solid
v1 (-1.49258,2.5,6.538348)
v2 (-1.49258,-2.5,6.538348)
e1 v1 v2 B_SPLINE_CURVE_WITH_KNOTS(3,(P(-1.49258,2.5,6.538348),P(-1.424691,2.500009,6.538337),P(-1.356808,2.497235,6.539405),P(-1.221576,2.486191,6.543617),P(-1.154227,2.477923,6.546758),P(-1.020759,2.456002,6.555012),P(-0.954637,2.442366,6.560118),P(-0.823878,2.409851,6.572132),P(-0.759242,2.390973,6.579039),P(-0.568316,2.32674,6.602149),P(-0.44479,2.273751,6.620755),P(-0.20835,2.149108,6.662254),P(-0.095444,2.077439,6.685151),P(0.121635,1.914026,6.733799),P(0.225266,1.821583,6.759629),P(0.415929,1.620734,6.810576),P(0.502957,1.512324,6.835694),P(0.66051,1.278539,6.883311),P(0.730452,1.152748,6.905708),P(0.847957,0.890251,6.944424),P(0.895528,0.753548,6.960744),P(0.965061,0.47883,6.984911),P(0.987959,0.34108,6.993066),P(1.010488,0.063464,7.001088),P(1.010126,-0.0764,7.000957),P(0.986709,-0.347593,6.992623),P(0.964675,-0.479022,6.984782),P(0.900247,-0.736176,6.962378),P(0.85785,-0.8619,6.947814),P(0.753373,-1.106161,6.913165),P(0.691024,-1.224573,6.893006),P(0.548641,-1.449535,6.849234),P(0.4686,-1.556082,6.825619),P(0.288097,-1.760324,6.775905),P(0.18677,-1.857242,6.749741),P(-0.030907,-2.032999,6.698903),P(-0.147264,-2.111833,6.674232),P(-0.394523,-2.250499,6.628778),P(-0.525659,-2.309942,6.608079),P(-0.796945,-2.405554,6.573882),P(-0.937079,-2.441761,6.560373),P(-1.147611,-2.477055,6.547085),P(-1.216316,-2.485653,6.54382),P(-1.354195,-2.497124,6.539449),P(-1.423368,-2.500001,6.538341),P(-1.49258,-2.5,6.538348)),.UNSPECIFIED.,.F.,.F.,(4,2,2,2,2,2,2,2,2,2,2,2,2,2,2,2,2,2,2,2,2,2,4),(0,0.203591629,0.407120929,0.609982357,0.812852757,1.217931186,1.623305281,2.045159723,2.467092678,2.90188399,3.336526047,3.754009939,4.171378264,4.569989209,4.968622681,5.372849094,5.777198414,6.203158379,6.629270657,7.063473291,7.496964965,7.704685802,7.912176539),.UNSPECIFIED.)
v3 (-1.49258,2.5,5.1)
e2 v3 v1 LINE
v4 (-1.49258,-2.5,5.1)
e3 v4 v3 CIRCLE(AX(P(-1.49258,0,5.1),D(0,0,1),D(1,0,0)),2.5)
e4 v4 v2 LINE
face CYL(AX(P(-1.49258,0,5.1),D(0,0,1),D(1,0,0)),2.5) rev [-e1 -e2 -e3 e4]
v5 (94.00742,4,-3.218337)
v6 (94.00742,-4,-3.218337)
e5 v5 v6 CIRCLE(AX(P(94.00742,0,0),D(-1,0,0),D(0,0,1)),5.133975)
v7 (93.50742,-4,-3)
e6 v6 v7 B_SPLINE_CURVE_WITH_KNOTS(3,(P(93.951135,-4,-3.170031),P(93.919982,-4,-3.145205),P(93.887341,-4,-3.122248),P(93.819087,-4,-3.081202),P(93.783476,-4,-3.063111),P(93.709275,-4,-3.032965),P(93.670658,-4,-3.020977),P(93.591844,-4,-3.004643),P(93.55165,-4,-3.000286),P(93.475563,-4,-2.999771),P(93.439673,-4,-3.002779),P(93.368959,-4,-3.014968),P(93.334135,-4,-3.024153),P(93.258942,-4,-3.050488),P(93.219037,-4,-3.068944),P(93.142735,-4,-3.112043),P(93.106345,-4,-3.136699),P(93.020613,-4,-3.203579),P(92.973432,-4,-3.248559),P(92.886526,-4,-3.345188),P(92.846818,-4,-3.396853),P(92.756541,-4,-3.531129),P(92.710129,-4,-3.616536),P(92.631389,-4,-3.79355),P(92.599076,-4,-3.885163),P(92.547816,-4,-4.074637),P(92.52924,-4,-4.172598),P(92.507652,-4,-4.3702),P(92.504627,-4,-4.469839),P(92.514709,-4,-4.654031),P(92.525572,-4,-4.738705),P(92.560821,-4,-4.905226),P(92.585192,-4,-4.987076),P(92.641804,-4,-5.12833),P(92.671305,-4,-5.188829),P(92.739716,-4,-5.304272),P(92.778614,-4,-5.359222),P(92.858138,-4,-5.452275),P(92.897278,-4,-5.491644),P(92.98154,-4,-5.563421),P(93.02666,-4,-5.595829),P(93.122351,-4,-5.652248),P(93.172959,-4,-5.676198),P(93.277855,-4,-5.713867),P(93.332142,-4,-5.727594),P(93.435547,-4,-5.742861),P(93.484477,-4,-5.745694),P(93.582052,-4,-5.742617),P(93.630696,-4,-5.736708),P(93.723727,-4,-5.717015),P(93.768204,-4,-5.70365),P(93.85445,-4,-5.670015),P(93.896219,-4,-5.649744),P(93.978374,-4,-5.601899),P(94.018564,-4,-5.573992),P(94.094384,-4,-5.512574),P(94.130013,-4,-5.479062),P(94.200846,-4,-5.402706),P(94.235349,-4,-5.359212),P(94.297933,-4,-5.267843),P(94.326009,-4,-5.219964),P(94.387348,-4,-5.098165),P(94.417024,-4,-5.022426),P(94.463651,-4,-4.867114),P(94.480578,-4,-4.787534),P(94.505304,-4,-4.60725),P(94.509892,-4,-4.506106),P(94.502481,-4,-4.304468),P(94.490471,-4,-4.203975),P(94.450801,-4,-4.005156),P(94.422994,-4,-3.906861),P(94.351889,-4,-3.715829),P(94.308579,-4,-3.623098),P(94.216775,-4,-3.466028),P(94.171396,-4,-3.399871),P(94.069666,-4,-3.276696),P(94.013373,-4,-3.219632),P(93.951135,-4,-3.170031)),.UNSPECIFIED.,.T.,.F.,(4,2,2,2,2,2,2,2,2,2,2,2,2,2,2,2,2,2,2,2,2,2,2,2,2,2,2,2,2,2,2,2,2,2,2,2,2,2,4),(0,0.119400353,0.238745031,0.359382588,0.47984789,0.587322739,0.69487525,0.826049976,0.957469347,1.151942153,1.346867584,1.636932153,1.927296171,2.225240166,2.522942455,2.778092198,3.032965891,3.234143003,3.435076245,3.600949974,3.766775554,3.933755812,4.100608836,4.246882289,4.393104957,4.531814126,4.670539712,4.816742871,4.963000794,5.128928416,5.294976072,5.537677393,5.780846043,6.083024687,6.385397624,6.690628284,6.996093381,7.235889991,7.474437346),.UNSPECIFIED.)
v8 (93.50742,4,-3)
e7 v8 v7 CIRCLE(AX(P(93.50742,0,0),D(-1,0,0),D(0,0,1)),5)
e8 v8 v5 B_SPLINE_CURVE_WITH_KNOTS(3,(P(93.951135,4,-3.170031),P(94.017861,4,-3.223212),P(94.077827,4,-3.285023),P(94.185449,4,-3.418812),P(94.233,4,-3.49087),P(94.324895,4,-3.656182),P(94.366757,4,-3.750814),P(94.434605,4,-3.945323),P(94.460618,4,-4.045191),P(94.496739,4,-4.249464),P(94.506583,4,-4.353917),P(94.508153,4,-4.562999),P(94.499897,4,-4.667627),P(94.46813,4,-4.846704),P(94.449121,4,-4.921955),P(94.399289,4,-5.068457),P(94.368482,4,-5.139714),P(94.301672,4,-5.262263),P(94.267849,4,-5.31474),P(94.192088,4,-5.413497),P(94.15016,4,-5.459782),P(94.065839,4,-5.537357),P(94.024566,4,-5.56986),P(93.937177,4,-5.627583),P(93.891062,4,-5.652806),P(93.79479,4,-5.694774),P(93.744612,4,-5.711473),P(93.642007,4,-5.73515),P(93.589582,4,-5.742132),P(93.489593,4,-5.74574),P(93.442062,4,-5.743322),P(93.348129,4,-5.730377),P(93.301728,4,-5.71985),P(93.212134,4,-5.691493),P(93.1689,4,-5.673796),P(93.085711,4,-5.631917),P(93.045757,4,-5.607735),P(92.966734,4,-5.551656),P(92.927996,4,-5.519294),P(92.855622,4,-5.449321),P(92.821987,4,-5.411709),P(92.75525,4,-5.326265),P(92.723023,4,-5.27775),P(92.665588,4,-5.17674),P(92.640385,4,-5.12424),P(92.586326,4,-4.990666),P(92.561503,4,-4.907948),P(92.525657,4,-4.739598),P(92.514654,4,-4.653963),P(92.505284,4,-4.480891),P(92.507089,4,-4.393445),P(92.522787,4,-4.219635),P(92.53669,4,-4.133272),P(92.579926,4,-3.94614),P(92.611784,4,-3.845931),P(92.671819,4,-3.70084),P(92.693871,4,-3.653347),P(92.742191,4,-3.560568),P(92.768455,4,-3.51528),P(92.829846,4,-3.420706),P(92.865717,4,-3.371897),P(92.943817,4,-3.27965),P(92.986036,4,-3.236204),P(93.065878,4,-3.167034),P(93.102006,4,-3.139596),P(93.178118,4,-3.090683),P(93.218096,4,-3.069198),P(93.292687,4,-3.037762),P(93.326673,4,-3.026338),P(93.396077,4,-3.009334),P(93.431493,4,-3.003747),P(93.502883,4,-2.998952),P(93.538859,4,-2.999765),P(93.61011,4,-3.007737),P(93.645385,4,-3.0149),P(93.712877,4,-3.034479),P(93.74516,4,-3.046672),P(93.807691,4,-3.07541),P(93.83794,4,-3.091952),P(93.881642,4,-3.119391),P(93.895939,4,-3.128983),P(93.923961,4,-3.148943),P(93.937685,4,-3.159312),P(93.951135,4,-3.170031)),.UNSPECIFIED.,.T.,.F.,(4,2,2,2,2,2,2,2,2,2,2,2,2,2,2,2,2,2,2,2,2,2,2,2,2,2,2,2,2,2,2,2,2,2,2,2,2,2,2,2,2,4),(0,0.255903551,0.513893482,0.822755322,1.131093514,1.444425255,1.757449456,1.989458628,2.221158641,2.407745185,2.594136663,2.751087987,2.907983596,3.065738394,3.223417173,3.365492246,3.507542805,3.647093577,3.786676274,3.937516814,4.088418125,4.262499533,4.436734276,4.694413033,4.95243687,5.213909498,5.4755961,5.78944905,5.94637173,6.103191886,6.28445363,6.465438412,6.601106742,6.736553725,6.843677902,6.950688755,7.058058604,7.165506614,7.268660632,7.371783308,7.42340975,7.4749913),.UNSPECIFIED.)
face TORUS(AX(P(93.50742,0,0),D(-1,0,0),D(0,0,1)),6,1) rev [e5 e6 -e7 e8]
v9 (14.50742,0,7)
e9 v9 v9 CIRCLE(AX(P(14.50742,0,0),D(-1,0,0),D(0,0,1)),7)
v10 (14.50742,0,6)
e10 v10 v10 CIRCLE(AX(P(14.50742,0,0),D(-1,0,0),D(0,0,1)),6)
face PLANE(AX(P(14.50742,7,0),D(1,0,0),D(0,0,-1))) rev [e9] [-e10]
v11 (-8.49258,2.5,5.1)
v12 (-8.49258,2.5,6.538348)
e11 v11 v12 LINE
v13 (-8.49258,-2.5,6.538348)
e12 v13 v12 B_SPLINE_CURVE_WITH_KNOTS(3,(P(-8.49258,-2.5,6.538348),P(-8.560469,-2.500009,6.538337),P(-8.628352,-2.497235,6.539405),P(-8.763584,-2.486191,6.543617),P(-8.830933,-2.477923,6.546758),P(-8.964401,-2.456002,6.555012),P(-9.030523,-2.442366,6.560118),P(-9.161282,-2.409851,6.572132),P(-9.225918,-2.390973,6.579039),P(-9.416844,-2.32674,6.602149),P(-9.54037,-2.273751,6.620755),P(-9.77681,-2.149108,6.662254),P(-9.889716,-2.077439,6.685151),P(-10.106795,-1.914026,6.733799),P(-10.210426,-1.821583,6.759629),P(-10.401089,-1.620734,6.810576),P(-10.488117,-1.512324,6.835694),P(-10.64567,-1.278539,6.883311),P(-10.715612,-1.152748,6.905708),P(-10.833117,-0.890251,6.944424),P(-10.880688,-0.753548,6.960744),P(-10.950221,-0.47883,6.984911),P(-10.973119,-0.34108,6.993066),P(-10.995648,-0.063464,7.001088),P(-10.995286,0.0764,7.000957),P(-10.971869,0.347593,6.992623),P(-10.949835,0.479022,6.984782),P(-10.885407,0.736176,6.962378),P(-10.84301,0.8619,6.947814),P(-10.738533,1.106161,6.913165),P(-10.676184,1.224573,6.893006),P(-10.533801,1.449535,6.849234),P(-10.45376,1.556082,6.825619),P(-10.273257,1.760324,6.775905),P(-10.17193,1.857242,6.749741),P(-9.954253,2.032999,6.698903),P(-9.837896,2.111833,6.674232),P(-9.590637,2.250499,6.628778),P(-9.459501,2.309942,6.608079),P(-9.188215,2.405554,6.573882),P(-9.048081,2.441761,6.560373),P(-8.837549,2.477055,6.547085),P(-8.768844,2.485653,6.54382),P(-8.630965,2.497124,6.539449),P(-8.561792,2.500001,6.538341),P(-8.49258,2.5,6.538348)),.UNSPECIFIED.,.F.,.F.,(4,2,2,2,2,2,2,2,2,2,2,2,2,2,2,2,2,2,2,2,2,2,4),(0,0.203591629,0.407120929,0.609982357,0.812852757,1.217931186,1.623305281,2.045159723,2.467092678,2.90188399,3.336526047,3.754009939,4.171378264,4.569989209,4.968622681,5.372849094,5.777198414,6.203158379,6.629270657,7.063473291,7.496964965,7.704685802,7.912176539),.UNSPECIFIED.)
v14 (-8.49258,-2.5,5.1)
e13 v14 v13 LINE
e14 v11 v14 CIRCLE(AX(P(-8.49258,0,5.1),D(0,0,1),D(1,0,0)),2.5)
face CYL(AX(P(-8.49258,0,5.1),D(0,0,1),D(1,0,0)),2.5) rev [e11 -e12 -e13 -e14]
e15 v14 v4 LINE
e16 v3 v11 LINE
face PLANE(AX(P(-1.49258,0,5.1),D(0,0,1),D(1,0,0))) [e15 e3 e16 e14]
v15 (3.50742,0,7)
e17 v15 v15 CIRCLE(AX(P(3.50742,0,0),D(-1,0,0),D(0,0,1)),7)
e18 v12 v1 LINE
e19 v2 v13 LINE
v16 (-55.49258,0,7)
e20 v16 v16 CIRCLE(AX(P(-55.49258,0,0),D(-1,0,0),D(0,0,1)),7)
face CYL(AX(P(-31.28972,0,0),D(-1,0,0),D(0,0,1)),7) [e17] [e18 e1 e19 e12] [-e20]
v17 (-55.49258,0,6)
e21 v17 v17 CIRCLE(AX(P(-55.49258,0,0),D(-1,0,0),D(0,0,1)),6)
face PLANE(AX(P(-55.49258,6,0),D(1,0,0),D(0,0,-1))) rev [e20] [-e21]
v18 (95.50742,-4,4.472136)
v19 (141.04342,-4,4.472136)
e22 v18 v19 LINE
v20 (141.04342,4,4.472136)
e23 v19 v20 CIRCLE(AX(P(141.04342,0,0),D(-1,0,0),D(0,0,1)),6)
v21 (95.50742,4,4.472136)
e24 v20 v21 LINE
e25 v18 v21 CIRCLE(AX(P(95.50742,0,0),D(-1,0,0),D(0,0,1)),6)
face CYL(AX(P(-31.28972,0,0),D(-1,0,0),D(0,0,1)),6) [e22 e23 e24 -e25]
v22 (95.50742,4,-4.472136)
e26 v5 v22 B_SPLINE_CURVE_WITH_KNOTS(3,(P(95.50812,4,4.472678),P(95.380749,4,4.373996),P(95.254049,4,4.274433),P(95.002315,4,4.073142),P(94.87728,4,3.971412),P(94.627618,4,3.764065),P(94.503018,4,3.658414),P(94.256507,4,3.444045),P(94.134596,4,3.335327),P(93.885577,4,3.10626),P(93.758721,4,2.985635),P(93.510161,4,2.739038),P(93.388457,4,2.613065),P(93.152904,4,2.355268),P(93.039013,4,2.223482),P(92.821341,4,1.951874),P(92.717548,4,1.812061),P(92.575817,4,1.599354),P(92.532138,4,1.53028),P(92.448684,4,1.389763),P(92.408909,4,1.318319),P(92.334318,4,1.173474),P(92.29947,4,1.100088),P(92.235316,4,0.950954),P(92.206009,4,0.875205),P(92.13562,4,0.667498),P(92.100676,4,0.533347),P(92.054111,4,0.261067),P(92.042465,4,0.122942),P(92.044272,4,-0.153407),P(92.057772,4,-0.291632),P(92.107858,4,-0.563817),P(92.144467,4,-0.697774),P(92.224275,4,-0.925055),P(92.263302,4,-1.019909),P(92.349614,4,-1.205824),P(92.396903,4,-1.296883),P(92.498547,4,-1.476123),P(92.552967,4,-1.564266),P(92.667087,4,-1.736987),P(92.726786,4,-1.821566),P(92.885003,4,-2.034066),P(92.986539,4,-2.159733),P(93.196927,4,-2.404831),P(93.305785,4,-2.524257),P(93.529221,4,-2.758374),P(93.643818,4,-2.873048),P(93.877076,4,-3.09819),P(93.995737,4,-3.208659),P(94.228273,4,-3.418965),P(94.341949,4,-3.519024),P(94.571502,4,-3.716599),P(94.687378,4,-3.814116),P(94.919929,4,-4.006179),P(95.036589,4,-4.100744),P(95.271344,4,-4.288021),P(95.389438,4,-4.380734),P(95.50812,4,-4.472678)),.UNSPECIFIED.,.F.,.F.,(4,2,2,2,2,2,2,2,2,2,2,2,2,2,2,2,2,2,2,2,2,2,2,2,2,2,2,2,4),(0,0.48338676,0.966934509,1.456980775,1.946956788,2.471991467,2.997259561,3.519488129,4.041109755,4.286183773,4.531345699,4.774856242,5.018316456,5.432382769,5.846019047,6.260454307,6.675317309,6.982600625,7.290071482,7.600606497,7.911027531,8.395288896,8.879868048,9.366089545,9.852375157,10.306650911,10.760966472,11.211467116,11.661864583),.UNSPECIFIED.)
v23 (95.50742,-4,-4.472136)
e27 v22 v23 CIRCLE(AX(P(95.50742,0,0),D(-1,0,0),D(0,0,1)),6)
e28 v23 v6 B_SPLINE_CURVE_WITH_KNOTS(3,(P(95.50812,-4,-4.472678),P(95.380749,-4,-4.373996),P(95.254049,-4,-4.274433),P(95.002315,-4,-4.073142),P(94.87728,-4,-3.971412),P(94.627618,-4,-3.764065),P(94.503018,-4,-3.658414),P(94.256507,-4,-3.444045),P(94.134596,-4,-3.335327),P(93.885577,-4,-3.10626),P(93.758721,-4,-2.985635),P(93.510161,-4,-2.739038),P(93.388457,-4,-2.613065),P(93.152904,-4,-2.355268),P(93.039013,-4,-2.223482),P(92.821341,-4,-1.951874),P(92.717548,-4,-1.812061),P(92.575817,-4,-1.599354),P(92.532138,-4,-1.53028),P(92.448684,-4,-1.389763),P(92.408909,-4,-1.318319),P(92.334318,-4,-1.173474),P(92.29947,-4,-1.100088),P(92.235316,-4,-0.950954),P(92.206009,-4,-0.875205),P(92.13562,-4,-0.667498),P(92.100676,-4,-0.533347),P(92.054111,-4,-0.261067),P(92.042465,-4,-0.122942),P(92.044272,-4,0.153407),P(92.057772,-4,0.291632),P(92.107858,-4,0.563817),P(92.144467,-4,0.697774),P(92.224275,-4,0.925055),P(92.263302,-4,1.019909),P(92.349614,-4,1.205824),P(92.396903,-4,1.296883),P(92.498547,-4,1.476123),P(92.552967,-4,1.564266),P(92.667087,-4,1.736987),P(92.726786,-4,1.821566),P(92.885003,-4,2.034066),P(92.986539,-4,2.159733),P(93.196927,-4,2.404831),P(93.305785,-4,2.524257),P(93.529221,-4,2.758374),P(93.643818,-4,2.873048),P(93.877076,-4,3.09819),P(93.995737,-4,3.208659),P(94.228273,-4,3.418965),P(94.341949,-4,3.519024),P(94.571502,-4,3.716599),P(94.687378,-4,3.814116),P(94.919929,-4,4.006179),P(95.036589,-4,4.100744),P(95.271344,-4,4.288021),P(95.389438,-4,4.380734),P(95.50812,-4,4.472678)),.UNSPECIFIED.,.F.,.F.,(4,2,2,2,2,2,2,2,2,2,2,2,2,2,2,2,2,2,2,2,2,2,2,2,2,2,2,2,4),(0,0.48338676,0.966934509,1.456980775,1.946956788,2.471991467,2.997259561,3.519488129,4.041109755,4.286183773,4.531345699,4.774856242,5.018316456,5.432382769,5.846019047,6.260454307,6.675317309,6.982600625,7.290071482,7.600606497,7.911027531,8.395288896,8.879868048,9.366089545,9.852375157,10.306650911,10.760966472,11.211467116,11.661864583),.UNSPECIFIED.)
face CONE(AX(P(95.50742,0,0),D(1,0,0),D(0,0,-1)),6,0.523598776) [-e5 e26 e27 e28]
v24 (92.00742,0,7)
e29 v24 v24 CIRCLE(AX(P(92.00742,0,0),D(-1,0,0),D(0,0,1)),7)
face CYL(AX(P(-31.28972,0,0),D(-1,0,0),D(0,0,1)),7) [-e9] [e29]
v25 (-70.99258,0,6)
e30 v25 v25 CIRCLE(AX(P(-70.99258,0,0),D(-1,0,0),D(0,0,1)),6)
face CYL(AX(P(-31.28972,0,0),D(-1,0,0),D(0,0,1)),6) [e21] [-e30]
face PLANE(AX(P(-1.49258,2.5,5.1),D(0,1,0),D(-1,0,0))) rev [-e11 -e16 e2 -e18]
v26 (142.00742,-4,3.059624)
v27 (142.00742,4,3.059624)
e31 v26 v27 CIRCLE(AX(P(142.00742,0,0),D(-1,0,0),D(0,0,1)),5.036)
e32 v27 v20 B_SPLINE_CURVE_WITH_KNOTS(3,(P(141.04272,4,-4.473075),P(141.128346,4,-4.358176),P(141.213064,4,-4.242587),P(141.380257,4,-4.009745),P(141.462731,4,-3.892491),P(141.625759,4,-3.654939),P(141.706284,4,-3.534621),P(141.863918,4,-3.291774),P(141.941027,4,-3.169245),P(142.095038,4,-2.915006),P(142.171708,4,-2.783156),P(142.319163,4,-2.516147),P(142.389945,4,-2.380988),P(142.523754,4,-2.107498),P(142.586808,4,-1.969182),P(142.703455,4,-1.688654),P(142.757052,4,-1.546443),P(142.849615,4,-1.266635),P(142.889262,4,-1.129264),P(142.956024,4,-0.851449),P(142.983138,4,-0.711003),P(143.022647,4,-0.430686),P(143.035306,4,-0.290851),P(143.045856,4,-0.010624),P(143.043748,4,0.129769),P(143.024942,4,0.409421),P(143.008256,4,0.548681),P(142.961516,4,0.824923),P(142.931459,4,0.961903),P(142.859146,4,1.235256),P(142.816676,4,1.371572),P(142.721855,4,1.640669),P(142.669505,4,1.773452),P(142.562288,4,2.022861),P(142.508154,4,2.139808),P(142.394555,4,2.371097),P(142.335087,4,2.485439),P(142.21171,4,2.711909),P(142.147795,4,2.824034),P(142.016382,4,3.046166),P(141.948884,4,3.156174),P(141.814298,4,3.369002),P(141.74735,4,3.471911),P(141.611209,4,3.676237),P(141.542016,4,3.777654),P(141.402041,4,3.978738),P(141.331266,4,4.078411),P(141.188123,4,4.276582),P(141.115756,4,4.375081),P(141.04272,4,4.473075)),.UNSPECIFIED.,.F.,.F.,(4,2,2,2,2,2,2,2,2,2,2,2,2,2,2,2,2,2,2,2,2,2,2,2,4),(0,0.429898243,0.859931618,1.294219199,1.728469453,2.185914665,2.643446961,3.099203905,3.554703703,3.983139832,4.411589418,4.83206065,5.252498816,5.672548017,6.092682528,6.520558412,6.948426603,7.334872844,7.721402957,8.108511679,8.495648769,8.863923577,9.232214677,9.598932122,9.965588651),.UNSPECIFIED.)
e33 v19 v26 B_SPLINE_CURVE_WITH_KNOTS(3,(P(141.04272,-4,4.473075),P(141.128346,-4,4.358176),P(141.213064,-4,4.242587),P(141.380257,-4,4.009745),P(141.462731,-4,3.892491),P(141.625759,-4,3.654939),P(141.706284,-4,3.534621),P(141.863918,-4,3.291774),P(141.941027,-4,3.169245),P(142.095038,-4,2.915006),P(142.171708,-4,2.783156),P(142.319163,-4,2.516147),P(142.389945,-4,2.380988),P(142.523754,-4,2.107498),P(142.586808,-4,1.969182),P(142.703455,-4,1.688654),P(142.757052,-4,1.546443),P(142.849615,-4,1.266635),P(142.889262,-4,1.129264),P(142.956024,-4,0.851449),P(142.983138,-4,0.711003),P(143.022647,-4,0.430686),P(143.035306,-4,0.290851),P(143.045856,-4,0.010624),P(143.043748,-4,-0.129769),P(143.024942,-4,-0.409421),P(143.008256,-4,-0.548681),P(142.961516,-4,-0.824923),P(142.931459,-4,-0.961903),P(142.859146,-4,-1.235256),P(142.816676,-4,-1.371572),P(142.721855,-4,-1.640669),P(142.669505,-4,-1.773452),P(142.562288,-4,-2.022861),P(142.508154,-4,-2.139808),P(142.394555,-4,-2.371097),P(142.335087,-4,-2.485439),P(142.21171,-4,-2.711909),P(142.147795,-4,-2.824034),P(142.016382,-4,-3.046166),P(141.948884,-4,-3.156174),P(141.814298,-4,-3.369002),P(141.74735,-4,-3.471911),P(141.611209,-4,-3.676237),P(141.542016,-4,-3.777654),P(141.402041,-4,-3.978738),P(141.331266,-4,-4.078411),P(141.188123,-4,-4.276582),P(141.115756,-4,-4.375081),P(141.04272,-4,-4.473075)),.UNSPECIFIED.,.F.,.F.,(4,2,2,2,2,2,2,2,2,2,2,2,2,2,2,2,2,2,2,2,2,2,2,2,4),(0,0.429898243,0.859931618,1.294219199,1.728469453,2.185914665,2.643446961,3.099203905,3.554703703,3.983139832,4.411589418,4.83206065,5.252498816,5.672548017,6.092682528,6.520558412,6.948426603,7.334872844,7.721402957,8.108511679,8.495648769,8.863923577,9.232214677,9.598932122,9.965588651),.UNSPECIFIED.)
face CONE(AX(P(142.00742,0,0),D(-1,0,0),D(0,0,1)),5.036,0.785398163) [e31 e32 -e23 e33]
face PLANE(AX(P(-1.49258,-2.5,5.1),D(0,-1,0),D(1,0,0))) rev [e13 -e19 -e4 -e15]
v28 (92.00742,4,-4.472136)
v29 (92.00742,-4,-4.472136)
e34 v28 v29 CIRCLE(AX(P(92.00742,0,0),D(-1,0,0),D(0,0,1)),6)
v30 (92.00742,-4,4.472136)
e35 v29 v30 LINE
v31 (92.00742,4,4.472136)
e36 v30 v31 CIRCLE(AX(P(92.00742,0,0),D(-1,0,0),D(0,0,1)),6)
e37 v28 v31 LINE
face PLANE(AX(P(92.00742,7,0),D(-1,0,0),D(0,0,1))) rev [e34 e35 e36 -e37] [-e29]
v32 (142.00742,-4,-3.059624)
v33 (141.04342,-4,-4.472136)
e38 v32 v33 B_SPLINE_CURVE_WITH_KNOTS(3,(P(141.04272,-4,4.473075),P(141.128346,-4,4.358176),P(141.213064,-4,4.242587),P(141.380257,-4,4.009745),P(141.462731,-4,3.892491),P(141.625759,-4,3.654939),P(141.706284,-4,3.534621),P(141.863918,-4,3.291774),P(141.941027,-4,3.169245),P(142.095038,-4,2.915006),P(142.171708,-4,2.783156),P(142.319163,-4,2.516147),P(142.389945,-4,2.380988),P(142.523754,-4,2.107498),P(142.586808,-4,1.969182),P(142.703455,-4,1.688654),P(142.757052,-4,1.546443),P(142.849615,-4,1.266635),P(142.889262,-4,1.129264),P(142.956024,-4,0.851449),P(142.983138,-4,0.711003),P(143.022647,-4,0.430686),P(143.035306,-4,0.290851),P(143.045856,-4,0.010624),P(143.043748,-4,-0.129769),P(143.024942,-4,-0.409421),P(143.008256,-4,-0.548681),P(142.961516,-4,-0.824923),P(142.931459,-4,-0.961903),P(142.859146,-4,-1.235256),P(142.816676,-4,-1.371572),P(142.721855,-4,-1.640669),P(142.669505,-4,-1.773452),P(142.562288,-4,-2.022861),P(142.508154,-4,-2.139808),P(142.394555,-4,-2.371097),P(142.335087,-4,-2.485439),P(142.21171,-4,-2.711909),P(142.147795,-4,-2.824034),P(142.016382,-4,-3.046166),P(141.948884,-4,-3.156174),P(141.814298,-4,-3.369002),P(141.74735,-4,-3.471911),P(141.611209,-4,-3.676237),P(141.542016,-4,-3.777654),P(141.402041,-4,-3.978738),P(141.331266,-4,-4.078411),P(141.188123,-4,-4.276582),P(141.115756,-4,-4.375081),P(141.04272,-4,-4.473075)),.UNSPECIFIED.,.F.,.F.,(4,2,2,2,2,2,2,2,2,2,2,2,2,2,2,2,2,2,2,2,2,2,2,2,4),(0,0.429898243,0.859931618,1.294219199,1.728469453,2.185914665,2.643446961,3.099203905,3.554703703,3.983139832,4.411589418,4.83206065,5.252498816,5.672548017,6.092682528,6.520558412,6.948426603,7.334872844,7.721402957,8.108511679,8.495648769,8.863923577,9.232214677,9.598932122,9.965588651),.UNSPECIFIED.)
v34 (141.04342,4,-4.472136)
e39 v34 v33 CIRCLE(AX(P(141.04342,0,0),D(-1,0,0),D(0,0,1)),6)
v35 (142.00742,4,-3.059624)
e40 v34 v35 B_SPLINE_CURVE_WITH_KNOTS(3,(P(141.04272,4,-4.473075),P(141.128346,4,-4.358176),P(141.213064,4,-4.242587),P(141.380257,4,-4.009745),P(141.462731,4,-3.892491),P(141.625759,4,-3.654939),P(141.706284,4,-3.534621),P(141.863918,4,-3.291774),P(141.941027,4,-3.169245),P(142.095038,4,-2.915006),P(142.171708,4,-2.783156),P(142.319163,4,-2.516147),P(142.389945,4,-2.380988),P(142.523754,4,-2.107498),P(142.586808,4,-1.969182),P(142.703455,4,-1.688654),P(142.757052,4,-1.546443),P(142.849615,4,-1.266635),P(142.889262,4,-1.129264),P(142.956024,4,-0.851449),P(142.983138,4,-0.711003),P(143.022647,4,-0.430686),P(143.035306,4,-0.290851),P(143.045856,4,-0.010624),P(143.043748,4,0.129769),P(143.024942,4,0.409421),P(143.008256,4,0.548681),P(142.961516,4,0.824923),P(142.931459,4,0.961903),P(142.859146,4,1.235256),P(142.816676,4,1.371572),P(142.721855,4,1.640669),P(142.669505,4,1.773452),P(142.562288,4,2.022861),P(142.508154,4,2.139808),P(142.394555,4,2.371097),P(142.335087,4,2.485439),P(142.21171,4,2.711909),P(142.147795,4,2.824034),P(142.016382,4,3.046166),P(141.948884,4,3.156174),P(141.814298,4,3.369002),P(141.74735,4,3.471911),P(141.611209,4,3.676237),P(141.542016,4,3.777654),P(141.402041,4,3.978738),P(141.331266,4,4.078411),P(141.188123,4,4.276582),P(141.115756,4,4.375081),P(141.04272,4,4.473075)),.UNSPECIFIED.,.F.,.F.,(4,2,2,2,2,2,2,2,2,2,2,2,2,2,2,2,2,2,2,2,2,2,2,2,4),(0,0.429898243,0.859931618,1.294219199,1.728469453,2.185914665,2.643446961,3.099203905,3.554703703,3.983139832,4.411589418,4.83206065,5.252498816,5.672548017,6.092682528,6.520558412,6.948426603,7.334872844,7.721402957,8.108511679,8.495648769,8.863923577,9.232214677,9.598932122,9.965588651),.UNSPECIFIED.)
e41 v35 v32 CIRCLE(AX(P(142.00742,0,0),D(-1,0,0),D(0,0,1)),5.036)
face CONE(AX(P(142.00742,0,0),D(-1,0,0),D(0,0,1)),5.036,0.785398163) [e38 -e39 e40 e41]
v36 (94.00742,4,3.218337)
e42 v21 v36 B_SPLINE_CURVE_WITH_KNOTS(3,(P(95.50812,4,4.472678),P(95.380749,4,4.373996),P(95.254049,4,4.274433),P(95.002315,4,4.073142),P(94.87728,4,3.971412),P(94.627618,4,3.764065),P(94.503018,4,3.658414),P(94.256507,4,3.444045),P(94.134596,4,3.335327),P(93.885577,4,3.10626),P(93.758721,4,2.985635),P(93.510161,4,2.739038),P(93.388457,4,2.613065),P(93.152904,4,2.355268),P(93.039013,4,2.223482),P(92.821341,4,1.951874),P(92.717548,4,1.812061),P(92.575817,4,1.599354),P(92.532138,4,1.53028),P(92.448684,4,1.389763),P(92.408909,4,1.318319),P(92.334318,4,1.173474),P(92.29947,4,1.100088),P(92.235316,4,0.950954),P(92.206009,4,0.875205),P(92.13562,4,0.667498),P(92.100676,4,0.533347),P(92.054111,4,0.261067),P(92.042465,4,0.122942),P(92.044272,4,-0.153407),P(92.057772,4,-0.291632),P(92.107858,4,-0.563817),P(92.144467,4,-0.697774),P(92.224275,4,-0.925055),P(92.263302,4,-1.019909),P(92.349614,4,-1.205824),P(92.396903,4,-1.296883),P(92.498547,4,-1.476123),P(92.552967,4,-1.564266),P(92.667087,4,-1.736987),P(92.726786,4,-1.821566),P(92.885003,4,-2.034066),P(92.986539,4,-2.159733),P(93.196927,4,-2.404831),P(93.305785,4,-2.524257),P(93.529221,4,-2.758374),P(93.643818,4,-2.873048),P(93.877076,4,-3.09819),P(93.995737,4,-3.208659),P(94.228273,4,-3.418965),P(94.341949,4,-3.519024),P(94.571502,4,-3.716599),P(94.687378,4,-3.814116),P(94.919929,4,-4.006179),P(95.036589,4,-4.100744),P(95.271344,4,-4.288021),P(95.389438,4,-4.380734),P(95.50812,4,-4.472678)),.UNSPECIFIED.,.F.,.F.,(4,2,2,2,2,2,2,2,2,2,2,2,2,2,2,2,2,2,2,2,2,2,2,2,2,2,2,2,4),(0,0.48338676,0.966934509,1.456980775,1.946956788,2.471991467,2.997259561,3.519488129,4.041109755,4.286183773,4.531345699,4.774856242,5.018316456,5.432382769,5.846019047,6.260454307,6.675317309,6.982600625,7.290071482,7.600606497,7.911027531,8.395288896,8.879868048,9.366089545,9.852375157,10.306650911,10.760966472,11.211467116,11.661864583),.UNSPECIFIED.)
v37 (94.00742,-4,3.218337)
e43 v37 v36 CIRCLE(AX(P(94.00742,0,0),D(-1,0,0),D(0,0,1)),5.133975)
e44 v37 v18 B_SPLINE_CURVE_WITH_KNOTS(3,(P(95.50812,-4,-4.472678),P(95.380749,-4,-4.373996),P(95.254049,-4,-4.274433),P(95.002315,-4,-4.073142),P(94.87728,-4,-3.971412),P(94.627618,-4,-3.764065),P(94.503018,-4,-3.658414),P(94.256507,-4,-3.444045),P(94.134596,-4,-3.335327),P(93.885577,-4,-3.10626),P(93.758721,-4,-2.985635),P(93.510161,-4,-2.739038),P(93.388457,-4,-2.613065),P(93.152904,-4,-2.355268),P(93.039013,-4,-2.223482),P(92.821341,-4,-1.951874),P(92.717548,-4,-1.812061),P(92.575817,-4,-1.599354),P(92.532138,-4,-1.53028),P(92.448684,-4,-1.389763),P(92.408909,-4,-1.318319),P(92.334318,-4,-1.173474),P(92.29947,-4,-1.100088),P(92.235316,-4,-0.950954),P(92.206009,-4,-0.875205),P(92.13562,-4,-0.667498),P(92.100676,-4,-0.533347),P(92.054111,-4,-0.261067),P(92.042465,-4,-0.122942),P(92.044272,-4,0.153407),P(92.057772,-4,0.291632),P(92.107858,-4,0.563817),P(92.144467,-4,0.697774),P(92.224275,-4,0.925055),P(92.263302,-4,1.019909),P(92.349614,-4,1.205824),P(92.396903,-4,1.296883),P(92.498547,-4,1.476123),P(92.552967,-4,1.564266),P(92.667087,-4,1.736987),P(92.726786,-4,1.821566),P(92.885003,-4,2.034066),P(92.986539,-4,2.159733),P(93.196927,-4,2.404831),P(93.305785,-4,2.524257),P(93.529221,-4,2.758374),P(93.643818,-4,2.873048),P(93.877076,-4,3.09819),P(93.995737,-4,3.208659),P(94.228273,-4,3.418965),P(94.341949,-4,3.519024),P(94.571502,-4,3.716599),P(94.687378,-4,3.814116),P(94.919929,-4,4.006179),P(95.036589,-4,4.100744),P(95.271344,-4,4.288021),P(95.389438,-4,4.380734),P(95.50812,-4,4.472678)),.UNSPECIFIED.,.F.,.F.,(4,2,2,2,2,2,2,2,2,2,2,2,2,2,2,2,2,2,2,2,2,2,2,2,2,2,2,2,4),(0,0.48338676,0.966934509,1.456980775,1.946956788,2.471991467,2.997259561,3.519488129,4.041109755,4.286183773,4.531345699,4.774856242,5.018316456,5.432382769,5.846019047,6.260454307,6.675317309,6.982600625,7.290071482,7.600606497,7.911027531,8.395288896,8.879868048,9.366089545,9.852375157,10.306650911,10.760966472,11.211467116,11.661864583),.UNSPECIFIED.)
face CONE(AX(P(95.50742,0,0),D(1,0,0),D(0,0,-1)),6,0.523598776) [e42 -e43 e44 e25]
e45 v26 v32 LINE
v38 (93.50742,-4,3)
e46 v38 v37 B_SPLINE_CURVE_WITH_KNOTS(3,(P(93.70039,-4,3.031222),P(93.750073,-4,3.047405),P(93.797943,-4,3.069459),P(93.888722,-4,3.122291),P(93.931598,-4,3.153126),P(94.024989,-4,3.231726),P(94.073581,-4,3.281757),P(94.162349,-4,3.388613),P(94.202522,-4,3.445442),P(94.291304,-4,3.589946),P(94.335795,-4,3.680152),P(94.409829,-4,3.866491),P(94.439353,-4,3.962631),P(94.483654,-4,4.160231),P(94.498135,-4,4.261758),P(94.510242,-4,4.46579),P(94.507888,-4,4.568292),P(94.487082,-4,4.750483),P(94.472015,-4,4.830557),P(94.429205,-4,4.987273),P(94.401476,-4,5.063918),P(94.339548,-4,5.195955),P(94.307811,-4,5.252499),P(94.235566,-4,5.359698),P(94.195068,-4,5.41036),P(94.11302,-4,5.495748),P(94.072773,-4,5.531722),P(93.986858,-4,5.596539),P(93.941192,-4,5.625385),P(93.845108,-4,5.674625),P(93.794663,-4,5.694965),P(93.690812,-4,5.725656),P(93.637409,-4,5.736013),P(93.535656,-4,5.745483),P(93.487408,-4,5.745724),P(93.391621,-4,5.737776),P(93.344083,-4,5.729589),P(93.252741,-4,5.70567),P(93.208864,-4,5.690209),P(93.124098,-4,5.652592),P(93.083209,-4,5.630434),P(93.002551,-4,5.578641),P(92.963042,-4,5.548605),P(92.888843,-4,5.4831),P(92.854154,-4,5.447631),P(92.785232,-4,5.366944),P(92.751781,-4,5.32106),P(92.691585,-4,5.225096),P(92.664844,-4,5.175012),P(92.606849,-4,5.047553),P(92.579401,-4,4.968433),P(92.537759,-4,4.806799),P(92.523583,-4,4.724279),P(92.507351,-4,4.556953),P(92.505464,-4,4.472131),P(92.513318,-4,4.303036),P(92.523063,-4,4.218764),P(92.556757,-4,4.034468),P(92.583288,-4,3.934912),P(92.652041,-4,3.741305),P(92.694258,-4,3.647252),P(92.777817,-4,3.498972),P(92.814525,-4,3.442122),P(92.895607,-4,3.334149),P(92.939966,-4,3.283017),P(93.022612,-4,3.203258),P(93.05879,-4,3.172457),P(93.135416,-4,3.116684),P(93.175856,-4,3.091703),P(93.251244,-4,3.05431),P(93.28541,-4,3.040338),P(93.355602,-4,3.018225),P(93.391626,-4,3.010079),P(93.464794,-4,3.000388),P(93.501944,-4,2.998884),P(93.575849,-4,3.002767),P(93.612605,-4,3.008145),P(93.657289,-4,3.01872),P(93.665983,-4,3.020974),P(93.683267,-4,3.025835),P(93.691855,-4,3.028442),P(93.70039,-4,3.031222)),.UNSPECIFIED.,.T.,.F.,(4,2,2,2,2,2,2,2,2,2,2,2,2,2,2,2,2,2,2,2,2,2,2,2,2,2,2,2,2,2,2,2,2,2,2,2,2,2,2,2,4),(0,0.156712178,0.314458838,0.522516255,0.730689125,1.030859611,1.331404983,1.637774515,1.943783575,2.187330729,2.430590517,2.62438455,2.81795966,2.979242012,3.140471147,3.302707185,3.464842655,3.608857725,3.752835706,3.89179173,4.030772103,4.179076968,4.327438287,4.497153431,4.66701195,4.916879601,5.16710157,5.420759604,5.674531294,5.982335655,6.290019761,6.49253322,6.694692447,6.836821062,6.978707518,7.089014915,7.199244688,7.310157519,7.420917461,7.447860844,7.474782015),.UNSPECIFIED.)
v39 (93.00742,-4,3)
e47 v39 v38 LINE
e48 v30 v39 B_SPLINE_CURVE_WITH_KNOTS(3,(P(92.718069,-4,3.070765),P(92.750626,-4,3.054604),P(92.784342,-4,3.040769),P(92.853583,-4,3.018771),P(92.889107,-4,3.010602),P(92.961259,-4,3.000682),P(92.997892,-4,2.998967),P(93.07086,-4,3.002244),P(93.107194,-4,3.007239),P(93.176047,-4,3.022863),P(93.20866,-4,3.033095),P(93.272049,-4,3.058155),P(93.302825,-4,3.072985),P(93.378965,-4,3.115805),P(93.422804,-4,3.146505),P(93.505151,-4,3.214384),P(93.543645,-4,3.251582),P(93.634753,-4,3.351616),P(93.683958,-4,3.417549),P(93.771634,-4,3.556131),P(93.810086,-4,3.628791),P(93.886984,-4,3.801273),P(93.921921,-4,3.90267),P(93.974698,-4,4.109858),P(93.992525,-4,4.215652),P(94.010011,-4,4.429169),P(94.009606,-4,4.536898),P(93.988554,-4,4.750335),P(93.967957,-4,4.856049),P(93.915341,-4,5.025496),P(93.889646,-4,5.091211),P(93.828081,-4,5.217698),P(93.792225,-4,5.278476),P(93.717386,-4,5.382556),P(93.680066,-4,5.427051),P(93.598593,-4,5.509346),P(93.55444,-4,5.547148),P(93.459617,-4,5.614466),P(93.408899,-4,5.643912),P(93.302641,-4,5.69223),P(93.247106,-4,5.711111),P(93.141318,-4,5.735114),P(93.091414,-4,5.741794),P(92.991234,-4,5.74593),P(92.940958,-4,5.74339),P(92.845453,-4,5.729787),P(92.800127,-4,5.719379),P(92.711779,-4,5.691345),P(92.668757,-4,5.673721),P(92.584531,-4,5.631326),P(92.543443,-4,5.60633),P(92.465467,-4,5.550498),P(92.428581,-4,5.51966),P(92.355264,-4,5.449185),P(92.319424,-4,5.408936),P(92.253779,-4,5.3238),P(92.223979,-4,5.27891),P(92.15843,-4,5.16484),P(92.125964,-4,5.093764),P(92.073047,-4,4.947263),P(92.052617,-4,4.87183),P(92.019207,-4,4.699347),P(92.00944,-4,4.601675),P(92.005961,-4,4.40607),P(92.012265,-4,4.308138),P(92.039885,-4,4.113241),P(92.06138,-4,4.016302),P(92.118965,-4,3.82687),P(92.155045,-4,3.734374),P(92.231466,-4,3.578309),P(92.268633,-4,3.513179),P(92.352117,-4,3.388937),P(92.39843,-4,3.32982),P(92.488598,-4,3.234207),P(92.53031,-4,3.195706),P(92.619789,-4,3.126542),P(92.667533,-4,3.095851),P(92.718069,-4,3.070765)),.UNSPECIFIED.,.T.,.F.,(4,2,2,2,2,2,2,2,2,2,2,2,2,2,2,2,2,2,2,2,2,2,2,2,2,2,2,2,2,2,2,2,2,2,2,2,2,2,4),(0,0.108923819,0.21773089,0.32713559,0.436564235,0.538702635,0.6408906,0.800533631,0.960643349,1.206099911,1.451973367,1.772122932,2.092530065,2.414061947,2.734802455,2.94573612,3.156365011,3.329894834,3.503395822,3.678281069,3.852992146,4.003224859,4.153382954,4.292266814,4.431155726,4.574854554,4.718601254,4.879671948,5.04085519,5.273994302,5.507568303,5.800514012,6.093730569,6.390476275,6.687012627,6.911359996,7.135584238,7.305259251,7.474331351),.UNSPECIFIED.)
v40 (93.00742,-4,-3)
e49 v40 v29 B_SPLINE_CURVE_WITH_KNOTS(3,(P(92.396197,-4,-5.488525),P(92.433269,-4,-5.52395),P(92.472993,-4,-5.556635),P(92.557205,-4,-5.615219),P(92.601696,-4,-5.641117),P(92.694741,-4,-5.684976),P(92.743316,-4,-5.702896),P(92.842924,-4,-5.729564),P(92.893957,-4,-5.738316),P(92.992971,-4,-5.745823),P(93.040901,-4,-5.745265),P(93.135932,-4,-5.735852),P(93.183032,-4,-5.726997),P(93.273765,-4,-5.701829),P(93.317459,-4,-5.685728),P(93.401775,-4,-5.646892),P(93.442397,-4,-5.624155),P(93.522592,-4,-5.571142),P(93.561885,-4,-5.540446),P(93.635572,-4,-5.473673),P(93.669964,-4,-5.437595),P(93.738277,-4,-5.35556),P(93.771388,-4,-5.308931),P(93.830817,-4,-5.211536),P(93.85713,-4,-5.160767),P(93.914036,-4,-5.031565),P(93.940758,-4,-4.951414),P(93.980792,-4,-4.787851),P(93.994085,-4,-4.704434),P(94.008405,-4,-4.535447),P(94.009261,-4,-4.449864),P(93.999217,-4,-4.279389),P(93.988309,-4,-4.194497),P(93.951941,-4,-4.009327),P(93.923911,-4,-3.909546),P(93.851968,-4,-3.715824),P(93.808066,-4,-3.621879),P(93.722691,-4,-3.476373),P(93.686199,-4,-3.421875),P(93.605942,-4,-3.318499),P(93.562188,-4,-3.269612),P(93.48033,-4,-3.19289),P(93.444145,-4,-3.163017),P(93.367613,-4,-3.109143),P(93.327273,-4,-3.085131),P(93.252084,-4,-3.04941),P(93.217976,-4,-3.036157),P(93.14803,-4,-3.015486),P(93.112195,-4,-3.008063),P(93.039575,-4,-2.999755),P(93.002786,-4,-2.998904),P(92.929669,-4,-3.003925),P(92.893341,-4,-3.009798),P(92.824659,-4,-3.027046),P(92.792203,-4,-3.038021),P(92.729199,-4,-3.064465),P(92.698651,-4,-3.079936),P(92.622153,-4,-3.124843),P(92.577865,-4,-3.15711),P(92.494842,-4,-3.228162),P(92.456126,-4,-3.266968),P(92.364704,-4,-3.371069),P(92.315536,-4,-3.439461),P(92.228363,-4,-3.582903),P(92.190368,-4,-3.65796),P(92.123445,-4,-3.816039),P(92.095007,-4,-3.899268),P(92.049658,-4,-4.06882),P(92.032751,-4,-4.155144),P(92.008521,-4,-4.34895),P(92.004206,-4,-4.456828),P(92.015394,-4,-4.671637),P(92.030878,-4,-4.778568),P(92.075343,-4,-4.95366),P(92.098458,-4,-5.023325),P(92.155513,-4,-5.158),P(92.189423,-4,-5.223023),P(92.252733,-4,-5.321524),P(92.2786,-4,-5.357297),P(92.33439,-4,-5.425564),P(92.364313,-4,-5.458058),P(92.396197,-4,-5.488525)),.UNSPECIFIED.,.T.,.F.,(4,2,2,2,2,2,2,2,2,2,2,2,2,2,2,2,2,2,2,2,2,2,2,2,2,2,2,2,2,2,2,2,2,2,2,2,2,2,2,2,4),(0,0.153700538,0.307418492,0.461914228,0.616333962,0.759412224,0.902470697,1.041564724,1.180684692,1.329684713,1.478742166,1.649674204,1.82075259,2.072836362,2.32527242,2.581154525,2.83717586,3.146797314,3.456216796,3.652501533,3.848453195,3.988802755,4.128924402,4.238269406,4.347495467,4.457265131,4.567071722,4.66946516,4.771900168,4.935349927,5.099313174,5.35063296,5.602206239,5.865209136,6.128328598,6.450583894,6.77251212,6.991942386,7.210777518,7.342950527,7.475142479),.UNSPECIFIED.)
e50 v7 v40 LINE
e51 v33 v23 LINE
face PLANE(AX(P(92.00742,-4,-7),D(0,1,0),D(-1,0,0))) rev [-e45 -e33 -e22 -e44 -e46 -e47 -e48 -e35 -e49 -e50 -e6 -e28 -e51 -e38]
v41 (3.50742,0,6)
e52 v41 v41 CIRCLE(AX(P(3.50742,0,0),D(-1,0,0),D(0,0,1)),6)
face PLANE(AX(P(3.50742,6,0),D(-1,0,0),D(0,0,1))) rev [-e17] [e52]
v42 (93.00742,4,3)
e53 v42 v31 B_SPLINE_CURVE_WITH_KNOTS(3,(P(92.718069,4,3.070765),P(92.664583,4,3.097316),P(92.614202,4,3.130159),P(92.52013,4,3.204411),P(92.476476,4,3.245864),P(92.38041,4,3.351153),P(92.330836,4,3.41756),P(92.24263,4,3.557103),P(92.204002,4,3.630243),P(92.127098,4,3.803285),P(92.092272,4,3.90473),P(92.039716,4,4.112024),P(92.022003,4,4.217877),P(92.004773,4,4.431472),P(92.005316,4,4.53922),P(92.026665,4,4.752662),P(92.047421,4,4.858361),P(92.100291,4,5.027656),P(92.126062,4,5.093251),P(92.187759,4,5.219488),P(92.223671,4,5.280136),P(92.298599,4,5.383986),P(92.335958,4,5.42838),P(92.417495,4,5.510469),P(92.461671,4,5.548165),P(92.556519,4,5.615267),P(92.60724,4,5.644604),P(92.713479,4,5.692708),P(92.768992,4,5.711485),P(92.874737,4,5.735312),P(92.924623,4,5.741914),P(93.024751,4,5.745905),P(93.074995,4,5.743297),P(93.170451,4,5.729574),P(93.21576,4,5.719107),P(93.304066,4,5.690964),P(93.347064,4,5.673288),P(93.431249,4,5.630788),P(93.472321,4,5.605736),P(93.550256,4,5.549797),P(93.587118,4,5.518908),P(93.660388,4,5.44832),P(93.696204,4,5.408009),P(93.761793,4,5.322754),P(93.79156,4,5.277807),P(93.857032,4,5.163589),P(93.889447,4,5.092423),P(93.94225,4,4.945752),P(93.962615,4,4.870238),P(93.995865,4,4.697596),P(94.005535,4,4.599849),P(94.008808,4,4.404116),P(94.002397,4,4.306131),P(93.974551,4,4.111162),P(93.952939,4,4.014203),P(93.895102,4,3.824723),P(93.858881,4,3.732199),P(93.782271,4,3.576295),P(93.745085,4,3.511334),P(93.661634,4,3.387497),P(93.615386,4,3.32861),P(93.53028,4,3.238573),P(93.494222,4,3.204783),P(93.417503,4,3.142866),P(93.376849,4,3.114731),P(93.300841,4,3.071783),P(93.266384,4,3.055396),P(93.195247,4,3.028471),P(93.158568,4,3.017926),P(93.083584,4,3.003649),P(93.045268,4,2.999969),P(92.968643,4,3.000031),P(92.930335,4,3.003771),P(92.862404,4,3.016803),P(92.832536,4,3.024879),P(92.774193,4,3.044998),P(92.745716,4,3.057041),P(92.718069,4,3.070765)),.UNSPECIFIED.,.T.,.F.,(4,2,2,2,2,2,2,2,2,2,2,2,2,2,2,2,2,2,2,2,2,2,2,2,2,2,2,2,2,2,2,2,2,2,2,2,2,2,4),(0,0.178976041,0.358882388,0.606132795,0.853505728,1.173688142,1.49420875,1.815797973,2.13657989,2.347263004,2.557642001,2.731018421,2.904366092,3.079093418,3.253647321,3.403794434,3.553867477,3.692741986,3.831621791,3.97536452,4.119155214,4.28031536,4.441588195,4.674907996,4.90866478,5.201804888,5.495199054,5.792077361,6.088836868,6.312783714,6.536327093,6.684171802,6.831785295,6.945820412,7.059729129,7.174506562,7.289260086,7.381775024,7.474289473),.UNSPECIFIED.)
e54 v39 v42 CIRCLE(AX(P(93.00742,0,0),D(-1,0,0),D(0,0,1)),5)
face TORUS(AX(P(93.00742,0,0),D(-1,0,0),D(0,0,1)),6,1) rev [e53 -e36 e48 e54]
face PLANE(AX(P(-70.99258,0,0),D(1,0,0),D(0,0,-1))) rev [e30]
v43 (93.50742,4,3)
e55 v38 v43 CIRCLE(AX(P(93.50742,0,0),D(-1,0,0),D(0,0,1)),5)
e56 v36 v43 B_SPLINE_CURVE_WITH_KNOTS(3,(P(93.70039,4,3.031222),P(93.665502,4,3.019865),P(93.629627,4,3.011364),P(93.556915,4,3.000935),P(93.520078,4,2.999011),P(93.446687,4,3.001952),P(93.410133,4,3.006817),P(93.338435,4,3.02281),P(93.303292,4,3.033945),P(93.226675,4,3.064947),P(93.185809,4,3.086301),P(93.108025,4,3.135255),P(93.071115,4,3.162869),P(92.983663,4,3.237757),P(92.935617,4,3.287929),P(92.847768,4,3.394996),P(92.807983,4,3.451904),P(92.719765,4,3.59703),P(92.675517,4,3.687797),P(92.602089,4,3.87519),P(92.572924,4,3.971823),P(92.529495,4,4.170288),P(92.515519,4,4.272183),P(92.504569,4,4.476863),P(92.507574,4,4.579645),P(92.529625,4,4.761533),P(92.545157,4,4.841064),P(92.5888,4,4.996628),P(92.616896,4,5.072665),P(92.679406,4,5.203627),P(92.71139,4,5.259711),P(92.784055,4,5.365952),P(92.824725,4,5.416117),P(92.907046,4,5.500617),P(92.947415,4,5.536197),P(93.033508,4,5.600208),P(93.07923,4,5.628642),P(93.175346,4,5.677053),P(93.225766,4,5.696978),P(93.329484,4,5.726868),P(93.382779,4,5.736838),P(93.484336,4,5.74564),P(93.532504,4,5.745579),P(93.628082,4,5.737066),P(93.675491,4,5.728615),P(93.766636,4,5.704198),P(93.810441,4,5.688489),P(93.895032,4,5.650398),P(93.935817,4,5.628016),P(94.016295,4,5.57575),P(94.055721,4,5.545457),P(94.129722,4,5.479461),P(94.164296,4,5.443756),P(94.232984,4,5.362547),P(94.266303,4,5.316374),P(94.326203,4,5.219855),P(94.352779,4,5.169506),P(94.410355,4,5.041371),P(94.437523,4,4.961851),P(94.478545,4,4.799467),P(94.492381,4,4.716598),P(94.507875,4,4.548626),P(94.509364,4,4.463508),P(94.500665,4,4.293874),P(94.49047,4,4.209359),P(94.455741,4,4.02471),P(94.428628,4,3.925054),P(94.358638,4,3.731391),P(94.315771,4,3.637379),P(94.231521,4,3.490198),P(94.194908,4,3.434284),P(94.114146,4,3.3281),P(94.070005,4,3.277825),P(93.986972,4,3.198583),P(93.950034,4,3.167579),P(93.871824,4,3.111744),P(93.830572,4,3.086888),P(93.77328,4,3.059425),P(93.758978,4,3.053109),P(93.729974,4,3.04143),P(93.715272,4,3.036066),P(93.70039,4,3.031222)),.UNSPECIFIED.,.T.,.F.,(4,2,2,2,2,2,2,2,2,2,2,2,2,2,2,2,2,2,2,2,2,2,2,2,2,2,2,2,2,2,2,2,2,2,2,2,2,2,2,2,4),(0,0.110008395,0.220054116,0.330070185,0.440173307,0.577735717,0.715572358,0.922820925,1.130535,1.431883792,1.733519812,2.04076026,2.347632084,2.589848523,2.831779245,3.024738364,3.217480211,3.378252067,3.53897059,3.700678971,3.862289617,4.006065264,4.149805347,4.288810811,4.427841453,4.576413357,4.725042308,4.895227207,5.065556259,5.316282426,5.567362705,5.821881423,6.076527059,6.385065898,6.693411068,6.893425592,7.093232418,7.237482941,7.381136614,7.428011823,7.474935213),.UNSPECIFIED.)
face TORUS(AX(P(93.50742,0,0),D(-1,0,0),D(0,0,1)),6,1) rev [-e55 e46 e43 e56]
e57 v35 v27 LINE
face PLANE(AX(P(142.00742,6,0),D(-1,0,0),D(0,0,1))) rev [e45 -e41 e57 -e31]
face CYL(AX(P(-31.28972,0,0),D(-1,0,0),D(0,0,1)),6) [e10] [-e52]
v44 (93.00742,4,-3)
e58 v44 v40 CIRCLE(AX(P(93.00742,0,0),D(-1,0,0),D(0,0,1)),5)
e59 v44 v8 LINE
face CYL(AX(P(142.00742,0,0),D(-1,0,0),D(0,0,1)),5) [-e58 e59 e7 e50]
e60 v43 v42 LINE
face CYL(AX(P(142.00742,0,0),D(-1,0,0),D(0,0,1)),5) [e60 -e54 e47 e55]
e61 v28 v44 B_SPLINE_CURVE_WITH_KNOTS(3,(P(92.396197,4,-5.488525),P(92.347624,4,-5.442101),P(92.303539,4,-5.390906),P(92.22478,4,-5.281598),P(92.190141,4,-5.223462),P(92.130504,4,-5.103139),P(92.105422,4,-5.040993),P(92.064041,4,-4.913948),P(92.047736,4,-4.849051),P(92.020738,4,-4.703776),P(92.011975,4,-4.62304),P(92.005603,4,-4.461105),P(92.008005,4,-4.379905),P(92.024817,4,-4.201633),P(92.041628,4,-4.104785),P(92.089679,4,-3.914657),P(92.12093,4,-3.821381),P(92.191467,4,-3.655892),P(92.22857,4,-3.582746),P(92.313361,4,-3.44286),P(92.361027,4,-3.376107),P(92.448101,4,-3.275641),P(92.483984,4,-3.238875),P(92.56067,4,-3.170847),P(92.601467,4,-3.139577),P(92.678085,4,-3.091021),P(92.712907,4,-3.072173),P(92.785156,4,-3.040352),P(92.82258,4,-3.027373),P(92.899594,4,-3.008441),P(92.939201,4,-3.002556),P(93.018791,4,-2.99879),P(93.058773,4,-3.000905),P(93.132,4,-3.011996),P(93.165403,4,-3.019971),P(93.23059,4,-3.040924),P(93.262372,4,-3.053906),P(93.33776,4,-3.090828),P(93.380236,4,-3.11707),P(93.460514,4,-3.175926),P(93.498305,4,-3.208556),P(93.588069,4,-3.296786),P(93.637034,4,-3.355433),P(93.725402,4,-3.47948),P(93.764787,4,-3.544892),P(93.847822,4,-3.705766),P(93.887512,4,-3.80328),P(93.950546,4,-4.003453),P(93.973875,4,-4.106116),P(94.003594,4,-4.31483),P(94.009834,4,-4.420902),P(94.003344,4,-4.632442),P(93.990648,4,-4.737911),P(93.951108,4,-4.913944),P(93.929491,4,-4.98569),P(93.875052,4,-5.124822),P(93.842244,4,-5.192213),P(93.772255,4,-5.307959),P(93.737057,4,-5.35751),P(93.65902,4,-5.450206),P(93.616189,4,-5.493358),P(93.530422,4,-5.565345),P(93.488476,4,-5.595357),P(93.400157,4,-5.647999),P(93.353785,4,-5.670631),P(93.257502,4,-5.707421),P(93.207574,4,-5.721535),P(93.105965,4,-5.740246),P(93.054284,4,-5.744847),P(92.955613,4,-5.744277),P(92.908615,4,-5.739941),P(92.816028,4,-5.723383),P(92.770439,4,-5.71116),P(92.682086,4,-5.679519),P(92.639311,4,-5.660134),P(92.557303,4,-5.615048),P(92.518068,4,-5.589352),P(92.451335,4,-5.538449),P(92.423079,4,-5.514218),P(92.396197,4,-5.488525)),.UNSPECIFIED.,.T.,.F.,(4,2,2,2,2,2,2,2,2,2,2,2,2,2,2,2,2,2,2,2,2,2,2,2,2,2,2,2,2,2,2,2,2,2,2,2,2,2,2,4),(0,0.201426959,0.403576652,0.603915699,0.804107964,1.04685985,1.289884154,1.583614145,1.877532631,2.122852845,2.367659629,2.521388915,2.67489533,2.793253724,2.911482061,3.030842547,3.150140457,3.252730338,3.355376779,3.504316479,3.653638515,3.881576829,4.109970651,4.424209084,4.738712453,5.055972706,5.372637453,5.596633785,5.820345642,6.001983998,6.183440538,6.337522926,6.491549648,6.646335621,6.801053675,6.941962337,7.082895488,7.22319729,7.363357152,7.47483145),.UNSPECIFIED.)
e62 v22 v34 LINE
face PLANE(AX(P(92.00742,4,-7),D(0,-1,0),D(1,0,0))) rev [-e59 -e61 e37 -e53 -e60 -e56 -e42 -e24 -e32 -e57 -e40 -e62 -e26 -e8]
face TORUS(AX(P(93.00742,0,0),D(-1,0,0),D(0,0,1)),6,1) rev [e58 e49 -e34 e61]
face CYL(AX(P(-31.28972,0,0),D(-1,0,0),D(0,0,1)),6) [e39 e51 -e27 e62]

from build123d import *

# Parameters (mm, degrees)
SCHNITT_LINEAR_AUSTRAGEN1_DEPTH      = 143.352054199
SCHNITT_LINEAR_AUSTRAGEN1_DEPTH_BACK = 143.352054199
SKIZZE4_W                            = 80.01116069
SKIZZE4_H                            = 4.996766738
SCHNITT_LINEAR_AUSTRAGEN2_DEPTH      = 143.867446828
SCHNITT_LINEAR_AUSTRAGEN2_DEPTH_BACK = 1.9


# Read off the part's stored shape, not the designer's step: M12 Maschinengewinde Bolzen1
with BuildPart() as part:
    # Skizze2 → Rotation1 (revolve)
    with BuildSketch(Plane.XY, mode=Mode.PRIVATE) as rotation1_sk:
        Polygon((-70.992580001, 0), (-70.992580001, 6), (-55.492580001, 6), (-55.492580001, 7), (3.507419999, 7), (3.507419999, 6), (14.507419999, 6), (14.507419999, 7), (92.007419999, 7), (92.007419999, 6), (142.007419999, 6), (142.007419999, 0), align=None)
    revolve(rotation1_sk.sketch.rotate(Axis((-31.289719626, 0, 0), (1, 0, 0)), 90), axis=Axis((-31.289719626, 0, 0), (1, 0, 0)))

    # M12 Maschinengewinde Bolzen1 outline → M12 Maschinengewinde Bolzen1 (revolve, cut)
    with BuildSketch(Plane.YX):
        with BuildLine():
            Line((6, 95.507419999), (5.133974596, 94.007419999))
            ThreePointArc((5.133974596, 94.007419999), (5.034074174, 93.766239044), (5, 93.507419999))
            Line((5, 93.507419999), (5, 93.007419999))
            ThreePointArc((5, 93.007419999), (5.292893219, 92.300313218), (6, 92.007419999))
            Line((6, 92.007419999), (6, 95.507419999))
        make_face()
        Polygon((5.036, 142.007419999), (6, 141.043419999), (6, 142.007419999), align=None)
    revolve(axis=Axis((0, 0, 0), (1, 0, 0)), mode=Mode.SUBTRACT)

    # Skizze4 → Schnitt-Linear austragen1 (cut, two sides: drawn at the far end of the back side and taken through both)
    with BuildSketch(Plane.XY.offset(-SCHNITT_LINEAR_AUSTRAGEN1_DEPTH_BACK)):
        with Locations((132.013000344, 6.498383369)):
            Rectangle(SKIZZE4_W, SKIZZE4_H)
        with Locations((132.013000344, -6.498383369)):
            Rectangle(SKIZZE4_W, SKIZZE4_H)
    extrude(amount=SCHNITT_LINEAR_AUSTRAGEN1_DEPTH + SCHNITT_LINEAR_AUSTRAGEN1_DEPTH_BACK, mode=Mode.SUBTRACT)

    # Skizze5 → Schnitt-Linear austragen2 (cut, two sides: drawn at the far end of the back side and taken through both)
    with BuildSketch(Plane.XY.offset(7).offset(-SCHNITT_LINEAR_AUSTRAGEN2_DEPTH_BACK)):
        with BuildLine():
            Line((-1.492580001, -2.5), (-8.492580001, -2.5))
            ThreePointArc((-8.492580001, -2.5), (-10.992580001, 0), (-8.492580001, 2.5))
            Line((-8.492580001, 2.5), (-1.492580001, 2.5))
            ThreePointArc((-1.492580001, 2.5), (1.007419999, 0), (-1.492580001, -2.5))
        make_face()
    extrude(amount=SCHNITT_LINEAR_AUSTRAGEN2_DEPTH + SCHNITT_LINEAR_AUSTRAGEN2_DEPTH_BACK, mode=Mode.SUBTRACT)


solid = part.part
